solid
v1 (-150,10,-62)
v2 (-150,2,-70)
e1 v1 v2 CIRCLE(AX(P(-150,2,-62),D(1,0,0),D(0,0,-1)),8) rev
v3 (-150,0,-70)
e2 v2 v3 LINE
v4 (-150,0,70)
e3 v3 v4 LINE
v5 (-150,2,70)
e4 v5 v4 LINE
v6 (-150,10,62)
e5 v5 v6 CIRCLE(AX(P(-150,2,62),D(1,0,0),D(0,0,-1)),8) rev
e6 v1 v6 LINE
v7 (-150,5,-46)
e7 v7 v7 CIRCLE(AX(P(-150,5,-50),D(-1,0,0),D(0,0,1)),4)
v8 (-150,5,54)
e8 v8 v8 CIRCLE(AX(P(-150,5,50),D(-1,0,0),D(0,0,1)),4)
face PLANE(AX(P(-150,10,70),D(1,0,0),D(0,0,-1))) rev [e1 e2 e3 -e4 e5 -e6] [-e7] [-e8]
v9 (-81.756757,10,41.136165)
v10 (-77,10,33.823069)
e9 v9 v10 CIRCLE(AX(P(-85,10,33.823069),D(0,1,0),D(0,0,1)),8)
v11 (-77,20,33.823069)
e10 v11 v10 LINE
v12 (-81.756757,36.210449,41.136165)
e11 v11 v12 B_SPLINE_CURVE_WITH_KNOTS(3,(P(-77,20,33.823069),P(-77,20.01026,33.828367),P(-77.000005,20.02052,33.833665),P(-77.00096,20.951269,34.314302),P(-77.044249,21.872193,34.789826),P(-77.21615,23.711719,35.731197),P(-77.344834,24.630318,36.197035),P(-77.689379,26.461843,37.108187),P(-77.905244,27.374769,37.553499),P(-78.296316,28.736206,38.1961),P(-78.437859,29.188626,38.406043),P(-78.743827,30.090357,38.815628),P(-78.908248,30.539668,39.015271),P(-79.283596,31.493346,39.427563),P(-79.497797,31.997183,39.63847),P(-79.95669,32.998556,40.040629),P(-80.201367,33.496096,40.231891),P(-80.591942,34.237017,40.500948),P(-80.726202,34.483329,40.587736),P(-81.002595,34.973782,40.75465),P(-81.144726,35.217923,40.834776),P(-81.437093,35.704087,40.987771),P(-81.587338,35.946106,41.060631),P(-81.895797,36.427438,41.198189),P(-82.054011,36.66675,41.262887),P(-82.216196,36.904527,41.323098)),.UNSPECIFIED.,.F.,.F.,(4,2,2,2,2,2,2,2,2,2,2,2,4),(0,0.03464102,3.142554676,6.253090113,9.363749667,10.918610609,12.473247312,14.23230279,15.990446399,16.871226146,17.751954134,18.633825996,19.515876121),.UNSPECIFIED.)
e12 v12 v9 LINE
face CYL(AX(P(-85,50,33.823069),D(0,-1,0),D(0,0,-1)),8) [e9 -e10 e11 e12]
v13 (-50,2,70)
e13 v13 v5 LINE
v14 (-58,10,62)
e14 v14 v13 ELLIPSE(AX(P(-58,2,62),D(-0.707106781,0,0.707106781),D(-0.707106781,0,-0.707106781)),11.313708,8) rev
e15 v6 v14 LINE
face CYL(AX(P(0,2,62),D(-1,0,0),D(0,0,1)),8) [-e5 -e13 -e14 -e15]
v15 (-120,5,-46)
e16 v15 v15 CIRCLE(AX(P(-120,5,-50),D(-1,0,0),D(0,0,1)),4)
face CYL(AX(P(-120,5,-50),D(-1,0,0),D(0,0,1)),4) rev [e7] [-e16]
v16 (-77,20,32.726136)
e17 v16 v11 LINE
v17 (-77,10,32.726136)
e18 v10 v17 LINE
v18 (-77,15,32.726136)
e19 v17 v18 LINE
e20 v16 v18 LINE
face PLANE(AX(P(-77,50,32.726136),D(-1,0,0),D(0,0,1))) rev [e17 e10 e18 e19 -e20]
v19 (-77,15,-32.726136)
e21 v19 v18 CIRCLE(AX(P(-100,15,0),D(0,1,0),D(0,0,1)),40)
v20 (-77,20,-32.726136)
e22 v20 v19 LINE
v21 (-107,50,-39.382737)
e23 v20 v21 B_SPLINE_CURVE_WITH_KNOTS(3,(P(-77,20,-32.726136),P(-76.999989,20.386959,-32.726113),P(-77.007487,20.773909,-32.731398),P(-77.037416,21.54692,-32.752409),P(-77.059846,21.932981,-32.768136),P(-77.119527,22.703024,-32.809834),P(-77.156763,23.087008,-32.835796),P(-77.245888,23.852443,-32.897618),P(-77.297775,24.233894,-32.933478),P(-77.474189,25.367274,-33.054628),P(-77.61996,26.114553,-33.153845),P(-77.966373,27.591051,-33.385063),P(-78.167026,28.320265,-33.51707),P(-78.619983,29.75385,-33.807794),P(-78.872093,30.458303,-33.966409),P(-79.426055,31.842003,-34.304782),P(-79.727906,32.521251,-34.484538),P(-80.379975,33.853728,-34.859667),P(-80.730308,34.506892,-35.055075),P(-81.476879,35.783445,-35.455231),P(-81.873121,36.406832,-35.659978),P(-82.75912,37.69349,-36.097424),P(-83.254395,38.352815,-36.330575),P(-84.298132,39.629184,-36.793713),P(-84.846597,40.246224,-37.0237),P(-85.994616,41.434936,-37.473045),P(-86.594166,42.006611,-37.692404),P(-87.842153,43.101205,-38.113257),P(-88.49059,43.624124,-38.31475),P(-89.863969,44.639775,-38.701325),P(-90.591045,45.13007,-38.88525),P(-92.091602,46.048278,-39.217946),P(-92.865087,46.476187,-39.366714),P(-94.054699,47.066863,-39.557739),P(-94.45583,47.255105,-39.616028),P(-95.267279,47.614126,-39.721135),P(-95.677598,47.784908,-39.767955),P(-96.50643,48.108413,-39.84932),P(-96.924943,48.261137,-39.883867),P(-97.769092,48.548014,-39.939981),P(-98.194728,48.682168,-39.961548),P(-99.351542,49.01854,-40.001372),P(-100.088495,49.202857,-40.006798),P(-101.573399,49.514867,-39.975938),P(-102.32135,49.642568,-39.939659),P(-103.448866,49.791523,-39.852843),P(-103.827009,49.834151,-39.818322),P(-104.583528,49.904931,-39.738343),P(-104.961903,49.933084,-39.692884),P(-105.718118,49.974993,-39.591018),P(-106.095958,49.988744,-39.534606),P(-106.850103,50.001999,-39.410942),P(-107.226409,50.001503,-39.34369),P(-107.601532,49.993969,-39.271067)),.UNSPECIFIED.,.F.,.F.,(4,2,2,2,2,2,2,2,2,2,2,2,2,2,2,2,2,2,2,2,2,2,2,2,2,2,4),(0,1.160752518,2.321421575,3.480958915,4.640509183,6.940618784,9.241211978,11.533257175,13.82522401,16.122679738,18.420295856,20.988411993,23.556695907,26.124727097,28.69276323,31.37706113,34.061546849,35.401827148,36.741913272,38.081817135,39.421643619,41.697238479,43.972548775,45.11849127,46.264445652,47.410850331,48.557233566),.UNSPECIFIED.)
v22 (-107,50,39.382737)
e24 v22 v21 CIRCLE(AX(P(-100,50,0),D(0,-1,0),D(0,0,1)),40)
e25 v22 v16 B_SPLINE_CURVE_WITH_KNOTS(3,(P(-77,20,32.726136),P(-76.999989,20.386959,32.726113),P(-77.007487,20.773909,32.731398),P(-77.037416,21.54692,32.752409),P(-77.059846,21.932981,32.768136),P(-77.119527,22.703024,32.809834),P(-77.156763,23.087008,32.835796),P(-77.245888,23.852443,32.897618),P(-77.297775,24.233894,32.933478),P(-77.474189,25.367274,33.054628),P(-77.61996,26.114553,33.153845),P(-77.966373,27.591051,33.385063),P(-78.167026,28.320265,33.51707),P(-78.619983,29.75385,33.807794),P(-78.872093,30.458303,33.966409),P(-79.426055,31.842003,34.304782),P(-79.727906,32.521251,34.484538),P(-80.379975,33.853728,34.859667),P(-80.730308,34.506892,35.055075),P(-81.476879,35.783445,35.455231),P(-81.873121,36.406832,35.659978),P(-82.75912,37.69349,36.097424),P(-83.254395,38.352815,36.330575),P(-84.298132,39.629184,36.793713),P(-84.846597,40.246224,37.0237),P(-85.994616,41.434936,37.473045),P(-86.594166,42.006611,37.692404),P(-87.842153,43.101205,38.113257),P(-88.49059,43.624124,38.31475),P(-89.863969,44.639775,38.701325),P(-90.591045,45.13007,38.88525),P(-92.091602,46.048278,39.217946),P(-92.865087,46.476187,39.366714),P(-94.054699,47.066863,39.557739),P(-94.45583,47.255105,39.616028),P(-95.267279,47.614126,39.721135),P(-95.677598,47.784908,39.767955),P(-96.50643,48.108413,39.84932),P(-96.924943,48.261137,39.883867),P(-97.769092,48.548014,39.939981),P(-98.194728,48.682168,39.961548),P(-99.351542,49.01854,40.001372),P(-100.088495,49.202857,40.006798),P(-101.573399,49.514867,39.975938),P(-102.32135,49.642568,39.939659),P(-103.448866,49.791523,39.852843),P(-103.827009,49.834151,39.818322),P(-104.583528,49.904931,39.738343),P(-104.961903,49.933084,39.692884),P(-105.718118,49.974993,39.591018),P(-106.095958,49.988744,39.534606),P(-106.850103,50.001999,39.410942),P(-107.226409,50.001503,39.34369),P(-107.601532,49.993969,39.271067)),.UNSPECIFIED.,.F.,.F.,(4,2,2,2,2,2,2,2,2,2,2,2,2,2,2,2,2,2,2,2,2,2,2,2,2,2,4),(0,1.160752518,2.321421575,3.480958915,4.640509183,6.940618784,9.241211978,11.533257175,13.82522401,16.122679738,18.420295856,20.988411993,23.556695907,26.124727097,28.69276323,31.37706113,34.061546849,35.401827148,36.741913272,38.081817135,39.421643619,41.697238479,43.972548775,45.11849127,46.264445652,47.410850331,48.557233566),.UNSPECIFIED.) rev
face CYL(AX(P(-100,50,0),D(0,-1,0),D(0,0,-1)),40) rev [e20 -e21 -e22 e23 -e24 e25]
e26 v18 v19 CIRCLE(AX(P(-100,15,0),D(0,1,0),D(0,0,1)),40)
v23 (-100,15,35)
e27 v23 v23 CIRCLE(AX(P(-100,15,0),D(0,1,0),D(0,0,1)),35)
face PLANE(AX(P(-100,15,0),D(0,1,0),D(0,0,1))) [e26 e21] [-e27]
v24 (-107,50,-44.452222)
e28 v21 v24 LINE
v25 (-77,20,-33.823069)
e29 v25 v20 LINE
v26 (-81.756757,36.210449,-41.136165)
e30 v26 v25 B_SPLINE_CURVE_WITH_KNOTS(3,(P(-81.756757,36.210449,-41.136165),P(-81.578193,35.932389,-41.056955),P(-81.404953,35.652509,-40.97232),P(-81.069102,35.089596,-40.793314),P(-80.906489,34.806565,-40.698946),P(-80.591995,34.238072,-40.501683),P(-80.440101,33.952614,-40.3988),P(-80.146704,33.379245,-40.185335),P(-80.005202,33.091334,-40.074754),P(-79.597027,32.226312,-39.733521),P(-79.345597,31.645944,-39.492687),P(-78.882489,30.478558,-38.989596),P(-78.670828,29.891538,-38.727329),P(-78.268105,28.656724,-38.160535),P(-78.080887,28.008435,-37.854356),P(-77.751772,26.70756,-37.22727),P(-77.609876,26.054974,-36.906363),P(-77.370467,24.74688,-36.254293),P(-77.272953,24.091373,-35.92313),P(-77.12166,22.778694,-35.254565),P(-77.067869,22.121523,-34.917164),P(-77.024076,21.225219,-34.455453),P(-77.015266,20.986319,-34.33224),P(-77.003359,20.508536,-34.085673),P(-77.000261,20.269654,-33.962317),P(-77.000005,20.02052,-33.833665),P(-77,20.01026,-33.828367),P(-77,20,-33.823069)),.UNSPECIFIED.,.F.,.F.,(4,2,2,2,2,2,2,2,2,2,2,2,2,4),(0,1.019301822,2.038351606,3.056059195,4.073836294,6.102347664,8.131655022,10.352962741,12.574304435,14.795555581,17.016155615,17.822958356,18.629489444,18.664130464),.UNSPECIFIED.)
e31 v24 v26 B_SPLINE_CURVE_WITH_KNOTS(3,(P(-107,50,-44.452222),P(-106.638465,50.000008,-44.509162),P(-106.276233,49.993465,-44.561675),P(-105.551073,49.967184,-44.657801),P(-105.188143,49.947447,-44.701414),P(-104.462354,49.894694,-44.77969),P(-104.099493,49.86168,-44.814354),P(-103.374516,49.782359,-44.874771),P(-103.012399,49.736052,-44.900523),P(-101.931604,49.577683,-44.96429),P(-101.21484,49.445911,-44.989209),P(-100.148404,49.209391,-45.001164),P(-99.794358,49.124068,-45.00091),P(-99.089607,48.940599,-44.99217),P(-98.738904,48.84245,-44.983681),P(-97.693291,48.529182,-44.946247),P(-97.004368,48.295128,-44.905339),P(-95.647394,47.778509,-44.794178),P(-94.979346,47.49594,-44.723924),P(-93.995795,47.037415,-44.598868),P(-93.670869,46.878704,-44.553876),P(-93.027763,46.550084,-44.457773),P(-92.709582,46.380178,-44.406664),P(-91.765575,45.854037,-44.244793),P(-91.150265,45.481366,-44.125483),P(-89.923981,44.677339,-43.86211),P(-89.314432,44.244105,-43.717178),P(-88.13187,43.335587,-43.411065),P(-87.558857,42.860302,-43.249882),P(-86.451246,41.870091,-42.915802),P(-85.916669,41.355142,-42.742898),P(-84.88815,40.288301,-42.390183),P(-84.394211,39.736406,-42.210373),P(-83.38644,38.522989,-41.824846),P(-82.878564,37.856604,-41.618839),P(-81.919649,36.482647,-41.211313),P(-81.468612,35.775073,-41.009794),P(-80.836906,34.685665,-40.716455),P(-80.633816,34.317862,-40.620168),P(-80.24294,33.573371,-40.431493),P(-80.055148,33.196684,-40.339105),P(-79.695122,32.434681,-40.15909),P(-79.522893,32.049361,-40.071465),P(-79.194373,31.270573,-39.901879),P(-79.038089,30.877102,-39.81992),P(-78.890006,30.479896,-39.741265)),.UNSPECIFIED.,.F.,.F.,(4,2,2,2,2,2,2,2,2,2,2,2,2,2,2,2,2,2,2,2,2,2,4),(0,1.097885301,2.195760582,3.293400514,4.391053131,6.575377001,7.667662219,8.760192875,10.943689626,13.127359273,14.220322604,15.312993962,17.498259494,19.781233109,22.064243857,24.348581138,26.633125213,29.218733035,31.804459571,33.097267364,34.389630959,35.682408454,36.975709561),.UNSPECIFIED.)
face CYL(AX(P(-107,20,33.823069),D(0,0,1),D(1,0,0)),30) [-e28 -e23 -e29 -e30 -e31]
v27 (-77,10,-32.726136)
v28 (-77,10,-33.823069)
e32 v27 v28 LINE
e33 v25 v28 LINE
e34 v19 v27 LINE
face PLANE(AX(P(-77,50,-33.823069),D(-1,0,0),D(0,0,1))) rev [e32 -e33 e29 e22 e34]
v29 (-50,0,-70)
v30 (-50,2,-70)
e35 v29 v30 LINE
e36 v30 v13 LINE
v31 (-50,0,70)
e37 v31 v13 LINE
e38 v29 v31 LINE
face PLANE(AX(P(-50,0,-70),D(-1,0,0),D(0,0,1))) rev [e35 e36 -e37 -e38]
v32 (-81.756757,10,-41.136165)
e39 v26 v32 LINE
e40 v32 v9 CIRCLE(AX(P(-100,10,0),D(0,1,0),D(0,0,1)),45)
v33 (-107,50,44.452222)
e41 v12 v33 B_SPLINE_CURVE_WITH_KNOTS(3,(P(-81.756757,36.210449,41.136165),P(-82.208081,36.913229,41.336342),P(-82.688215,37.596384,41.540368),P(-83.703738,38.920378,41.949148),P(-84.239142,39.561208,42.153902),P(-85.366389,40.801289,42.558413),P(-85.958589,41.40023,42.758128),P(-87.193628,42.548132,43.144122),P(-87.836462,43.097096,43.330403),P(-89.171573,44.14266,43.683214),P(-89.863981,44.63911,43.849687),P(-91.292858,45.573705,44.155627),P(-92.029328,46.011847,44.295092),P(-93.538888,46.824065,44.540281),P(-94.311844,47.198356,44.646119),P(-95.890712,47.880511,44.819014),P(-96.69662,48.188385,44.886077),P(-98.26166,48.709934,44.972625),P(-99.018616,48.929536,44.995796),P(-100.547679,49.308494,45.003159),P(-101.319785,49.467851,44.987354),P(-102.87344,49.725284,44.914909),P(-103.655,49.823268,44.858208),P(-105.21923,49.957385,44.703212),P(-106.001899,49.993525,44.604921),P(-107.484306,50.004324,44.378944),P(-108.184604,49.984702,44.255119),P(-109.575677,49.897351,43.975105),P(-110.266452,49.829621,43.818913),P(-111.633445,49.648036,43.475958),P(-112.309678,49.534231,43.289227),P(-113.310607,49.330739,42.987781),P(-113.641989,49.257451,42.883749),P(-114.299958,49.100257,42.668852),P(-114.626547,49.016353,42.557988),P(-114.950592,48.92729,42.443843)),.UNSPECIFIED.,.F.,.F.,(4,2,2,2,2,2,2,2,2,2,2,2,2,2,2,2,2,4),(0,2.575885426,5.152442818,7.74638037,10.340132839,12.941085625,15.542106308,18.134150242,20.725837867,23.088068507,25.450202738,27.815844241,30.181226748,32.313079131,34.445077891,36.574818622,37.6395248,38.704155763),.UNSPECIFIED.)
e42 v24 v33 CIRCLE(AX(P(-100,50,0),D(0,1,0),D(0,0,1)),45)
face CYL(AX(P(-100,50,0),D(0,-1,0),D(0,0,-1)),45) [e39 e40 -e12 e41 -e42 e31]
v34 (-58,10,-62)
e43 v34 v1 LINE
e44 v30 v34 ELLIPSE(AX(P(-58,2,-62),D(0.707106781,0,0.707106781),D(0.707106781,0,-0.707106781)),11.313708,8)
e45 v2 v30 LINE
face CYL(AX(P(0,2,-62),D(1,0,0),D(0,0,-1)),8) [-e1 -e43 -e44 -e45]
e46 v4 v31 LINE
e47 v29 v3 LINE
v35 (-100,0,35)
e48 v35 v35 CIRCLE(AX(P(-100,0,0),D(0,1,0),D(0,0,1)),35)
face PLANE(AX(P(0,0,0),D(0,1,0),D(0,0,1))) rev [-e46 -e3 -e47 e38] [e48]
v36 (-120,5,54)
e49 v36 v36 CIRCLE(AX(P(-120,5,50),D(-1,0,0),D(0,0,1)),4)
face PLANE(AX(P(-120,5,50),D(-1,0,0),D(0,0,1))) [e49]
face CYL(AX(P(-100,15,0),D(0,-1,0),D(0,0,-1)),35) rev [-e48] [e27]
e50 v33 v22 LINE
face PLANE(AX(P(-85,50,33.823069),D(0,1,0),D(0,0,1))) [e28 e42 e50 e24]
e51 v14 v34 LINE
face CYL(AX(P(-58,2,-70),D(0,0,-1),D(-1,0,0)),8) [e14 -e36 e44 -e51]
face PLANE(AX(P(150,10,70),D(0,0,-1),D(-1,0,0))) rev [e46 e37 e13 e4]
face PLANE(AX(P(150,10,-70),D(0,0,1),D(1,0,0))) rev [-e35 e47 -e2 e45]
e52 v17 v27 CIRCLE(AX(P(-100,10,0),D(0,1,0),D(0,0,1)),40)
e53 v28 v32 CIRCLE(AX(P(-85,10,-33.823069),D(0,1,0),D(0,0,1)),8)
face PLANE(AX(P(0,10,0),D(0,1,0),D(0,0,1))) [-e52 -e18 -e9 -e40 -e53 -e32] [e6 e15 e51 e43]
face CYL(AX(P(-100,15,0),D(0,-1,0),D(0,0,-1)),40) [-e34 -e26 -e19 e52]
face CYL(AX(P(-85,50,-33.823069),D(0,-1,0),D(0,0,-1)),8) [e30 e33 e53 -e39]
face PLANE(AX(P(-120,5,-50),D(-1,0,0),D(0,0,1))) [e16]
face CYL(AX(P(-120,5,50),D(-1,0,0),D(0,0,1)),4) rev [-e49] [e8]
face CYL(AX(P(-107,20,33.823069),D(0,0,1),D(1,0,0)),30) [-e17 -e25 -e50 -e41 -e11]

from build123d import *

# Parameters (mm, degrees)
CROQUIS3_W                 = 300
CROQUIS3_H                 = 140
SALIENTE_EXTRUIR1_DEPTH    = 10
CROQUIS5_R                 = 40
CROQUIS5_R_2               = 35
SALIENTE_EXTRUIR2_DEPTH    = 5
SALIENTE_EXTRUIR5_DEPTH    = 40
REDONDEO3_START            = -46
REDONDEO3_DEPTH            = 13.273863656
REDONDEO4_START            = -44.452221542
REDONDEO4_DEPTH            = 90.452221542
CORTAR_EXTRUIR1_START      = -40
CROQUIS7_R                 = 35
CORTAR_EXTRUIR1_DEPTH      = 40
MATRIZL1_COUNT             = 3
MATRIZL1_PITCH             = 100
CORTAR_EXTRUIR3_DEPTH      = 171.293863683
CORTAR_EXTRUIR3_DEPTH_BACK = 171.293863683
CROQUIS10_W                = 200
CROQUIS10_H                = 140
CROQUIS12_R                = 4
CORTAR_EXTRUIR4_DEPTH      = 30
REDONDEO5_R                = 8


with BuildPart() as part:
    # Croquis3 → Saliente-Extruir1 (new body)
    with BuildSketch(Plane(origin=(0, 0, 0), x_dir=(1, 0, 0), z_dir=(0, 1, 0))):
        Rectangle(CROQUIS3_W, CROQUIS3_H)
    extrude(amount=SALIENTE_EXTRUIR1_DEPTH)

    # Croquis5 → Saliente-Extruir2 (add)
    # profile 1 of 3: a face of its own
    with BuildSketch(Plane(origin=(0, 10, 0), x_dir=(1, 0, 0), z_dir=(0, 1, 0))):
        with Locations(Location((-100, 0, 0), (0, 0, 270))):
            Circle(CROQUIS5_R)
        with Locations(Location((-100, 0, 0), (0, 0, 270))):
            Circle(CROQUIS5_R_2, mode=Mode.SUBTRACT)
    # profile 2 of 3: a face of its own
    with BuildSketch(Plane(origin=(0, 10, 0), x_dir=(1, 0, 0), z_dir=(0, 1, 0))):
        with Locations(Location((0, 0, 0), (0, 0, 270))):
            Circle(CROQUIS5_R)
        with Locations(Location((0, 0, 0), (0, 0, 270))):
            Circle(CROQUIS5_R_2, mode=Mode.SUBTRACT)
    # profile 3 of 3: a face of its own
    with BuildSketch(Plane(origin=(0, 10, 0), x_dir=(1, 0, 0), z_dir=(0, 1, 0))):
        with Locations(Location((100, 0, 0), (0, 0, 270))):
            Circle(CROQUIS5_R)
        with Locations(Location((100, 0, 0), (0, 0, 270))):
            Circle(CROQUIS5_R_2, mode=Mode.SUBTRACT)
    extrude(amount=SALIENTE_EXTRUIR2_DEPTH)

    # Croquis6 → Saliente-Extruir5 (add)
    with BuildSketch(Plane(origin=(0, 10, 0), x_dir=(1, 0, 0), z_dir=(0, 1, 0))):
        with BuildLine():
            Line((-77, 33.823069051), (-77, 32.726136344))
            ThreePointArc((-77, 32.726136344), (-140, 0), (-77, -32.726136344))
            Line((-77, -32.726136344), (-77, -33.823069051))
            ThreePointArc((-77, -33.823069051), (-78.293810846, -38.185067105), (-81.756756757, -41.136165062))
            ThreePointArc((-81.756756757, -41.136165062), (-145, 0), (-81.756756757, 41.136165062))
            ThreePointArc((-81.756756757, 41.136165062), (-78.293810846, 38.185067105), (-77, 33.823069051))
        make_face()
    saliente_extruir5 = extrude(amount=SALIENTE_EXTRUIR5_DEPTH)

    # Redondeo3: read off the stored shape, not the designer's step
    # Redondeo3 outline → Redondeo3 (cut)
    with BuildSketch(Plane.XY.offset(REDONDEO3_START)):
        with BuildLine():
            ThreePointArc((-107.000000862, 50), (-85.786796869, 41.21320374), (-77, 20))
            Line((-77, 20), (-77, 50))
            Line((-77, 50), (-107.000000862, 50))
        make_face()
    redondeo3 = extrude(amount=REDONDEO3_DEPTH, mode=Mode.SUBTRACT)

    # Redondeo4: read off the stored shape, not the designer's step
    # Redondeo4 outline → Redondeo4 (cut)
    with BuildSketch(Plane.XY.offset(REDONDEO4_START)):
        with BuildLine():
            ThreePointArc((-107.000000862, 50), (-85.786796869, 41.21320374), (-77, 20))
            Line((-77, 20), (-77, 50))
            Line((-77, 50), (-107.000000862, 50))
        make_face()
    redondeo4 = extrude(amount=REDONDEO4_DEPTH, mode=Mode.SUBTRACT)

    # Croquis7 → Cortar-Extruir1 (cut)
    with BuildSketch(Plane(origin=(0, 10, 0), x_dir=(1, 0, 0), z_dir=(0, 1, 0)).offset(CORTAR_EXTRUIR1_START)):
        with Locations(Location((-100, 0, 0), (0, 0, 270))):
            Circle(CROQUIS7_R)
    cortar_extruir1 = extrude(amount=CORTAR_EXTRUIR1_DEPTH, mode=Mode.SUBTRACT)

    # MatrizL1: Saliente-Extruir5, Redondeo3, Redondeo4, Cortar-Extruir1 ×3
    with Locations(*[(i * MATRIZL1_PITCH, 0, 0) for i in range(1, MATRIZL1_COUNT)]):
        add(saliente_extruir5)
        add(redondeo3, mode=Mode.SUBTRACT)
        add(redondeo4, mode=Mode.SUBTRACT)
        add(cortar_extruir1, mode=Mode.SUBTRACT)

    # Croquis10 → Cortar-Extruir3 (cut, two sides: drawn at the far end of the back side and taken through both)
    with BuildSketch(Plane(origin=(0, 10, 0), x_dir=(1, 0, 0), z_dir=(0, 1, 0)).offset(-CORTAR_EXTRUIR3_DEPTH_BACK)):
        with Locations((50, 0)):
            Rectangle(CROQUIS10_W, CROQUIS10_H)
    extrude(amount=CORTAR_EXTRUIR3_DEPTH + CORTAR_EXTRUIR3_DEPTH_BACK, mode=Mode.SUBTRACT)

    # Croquis12 → Cortar-Extruir4 (cut)
    with BuildSketch(Plane.ZY.offset(150)):
        with Locations((-50, 5)):
            Circle(CROQUIS12_R)
        with Locations((50, 5)):
            Circle(CROQUIS12_R)
    extrude(amount=-CORTAR_EXTRUIR4_DEPTH, mode=Mode.SUBTRACT)

    # Redondeo5
    redondeo5_edges = [part.edges().sort_by_distance(p)[0] for p in [
        (-100, 10, -70),
        (-50, 10, 0),
        (-100, 10, 70),
    ]]
    fillet(redondeo5_edges, radius=REDONDEO5_R)


solid = part.part
